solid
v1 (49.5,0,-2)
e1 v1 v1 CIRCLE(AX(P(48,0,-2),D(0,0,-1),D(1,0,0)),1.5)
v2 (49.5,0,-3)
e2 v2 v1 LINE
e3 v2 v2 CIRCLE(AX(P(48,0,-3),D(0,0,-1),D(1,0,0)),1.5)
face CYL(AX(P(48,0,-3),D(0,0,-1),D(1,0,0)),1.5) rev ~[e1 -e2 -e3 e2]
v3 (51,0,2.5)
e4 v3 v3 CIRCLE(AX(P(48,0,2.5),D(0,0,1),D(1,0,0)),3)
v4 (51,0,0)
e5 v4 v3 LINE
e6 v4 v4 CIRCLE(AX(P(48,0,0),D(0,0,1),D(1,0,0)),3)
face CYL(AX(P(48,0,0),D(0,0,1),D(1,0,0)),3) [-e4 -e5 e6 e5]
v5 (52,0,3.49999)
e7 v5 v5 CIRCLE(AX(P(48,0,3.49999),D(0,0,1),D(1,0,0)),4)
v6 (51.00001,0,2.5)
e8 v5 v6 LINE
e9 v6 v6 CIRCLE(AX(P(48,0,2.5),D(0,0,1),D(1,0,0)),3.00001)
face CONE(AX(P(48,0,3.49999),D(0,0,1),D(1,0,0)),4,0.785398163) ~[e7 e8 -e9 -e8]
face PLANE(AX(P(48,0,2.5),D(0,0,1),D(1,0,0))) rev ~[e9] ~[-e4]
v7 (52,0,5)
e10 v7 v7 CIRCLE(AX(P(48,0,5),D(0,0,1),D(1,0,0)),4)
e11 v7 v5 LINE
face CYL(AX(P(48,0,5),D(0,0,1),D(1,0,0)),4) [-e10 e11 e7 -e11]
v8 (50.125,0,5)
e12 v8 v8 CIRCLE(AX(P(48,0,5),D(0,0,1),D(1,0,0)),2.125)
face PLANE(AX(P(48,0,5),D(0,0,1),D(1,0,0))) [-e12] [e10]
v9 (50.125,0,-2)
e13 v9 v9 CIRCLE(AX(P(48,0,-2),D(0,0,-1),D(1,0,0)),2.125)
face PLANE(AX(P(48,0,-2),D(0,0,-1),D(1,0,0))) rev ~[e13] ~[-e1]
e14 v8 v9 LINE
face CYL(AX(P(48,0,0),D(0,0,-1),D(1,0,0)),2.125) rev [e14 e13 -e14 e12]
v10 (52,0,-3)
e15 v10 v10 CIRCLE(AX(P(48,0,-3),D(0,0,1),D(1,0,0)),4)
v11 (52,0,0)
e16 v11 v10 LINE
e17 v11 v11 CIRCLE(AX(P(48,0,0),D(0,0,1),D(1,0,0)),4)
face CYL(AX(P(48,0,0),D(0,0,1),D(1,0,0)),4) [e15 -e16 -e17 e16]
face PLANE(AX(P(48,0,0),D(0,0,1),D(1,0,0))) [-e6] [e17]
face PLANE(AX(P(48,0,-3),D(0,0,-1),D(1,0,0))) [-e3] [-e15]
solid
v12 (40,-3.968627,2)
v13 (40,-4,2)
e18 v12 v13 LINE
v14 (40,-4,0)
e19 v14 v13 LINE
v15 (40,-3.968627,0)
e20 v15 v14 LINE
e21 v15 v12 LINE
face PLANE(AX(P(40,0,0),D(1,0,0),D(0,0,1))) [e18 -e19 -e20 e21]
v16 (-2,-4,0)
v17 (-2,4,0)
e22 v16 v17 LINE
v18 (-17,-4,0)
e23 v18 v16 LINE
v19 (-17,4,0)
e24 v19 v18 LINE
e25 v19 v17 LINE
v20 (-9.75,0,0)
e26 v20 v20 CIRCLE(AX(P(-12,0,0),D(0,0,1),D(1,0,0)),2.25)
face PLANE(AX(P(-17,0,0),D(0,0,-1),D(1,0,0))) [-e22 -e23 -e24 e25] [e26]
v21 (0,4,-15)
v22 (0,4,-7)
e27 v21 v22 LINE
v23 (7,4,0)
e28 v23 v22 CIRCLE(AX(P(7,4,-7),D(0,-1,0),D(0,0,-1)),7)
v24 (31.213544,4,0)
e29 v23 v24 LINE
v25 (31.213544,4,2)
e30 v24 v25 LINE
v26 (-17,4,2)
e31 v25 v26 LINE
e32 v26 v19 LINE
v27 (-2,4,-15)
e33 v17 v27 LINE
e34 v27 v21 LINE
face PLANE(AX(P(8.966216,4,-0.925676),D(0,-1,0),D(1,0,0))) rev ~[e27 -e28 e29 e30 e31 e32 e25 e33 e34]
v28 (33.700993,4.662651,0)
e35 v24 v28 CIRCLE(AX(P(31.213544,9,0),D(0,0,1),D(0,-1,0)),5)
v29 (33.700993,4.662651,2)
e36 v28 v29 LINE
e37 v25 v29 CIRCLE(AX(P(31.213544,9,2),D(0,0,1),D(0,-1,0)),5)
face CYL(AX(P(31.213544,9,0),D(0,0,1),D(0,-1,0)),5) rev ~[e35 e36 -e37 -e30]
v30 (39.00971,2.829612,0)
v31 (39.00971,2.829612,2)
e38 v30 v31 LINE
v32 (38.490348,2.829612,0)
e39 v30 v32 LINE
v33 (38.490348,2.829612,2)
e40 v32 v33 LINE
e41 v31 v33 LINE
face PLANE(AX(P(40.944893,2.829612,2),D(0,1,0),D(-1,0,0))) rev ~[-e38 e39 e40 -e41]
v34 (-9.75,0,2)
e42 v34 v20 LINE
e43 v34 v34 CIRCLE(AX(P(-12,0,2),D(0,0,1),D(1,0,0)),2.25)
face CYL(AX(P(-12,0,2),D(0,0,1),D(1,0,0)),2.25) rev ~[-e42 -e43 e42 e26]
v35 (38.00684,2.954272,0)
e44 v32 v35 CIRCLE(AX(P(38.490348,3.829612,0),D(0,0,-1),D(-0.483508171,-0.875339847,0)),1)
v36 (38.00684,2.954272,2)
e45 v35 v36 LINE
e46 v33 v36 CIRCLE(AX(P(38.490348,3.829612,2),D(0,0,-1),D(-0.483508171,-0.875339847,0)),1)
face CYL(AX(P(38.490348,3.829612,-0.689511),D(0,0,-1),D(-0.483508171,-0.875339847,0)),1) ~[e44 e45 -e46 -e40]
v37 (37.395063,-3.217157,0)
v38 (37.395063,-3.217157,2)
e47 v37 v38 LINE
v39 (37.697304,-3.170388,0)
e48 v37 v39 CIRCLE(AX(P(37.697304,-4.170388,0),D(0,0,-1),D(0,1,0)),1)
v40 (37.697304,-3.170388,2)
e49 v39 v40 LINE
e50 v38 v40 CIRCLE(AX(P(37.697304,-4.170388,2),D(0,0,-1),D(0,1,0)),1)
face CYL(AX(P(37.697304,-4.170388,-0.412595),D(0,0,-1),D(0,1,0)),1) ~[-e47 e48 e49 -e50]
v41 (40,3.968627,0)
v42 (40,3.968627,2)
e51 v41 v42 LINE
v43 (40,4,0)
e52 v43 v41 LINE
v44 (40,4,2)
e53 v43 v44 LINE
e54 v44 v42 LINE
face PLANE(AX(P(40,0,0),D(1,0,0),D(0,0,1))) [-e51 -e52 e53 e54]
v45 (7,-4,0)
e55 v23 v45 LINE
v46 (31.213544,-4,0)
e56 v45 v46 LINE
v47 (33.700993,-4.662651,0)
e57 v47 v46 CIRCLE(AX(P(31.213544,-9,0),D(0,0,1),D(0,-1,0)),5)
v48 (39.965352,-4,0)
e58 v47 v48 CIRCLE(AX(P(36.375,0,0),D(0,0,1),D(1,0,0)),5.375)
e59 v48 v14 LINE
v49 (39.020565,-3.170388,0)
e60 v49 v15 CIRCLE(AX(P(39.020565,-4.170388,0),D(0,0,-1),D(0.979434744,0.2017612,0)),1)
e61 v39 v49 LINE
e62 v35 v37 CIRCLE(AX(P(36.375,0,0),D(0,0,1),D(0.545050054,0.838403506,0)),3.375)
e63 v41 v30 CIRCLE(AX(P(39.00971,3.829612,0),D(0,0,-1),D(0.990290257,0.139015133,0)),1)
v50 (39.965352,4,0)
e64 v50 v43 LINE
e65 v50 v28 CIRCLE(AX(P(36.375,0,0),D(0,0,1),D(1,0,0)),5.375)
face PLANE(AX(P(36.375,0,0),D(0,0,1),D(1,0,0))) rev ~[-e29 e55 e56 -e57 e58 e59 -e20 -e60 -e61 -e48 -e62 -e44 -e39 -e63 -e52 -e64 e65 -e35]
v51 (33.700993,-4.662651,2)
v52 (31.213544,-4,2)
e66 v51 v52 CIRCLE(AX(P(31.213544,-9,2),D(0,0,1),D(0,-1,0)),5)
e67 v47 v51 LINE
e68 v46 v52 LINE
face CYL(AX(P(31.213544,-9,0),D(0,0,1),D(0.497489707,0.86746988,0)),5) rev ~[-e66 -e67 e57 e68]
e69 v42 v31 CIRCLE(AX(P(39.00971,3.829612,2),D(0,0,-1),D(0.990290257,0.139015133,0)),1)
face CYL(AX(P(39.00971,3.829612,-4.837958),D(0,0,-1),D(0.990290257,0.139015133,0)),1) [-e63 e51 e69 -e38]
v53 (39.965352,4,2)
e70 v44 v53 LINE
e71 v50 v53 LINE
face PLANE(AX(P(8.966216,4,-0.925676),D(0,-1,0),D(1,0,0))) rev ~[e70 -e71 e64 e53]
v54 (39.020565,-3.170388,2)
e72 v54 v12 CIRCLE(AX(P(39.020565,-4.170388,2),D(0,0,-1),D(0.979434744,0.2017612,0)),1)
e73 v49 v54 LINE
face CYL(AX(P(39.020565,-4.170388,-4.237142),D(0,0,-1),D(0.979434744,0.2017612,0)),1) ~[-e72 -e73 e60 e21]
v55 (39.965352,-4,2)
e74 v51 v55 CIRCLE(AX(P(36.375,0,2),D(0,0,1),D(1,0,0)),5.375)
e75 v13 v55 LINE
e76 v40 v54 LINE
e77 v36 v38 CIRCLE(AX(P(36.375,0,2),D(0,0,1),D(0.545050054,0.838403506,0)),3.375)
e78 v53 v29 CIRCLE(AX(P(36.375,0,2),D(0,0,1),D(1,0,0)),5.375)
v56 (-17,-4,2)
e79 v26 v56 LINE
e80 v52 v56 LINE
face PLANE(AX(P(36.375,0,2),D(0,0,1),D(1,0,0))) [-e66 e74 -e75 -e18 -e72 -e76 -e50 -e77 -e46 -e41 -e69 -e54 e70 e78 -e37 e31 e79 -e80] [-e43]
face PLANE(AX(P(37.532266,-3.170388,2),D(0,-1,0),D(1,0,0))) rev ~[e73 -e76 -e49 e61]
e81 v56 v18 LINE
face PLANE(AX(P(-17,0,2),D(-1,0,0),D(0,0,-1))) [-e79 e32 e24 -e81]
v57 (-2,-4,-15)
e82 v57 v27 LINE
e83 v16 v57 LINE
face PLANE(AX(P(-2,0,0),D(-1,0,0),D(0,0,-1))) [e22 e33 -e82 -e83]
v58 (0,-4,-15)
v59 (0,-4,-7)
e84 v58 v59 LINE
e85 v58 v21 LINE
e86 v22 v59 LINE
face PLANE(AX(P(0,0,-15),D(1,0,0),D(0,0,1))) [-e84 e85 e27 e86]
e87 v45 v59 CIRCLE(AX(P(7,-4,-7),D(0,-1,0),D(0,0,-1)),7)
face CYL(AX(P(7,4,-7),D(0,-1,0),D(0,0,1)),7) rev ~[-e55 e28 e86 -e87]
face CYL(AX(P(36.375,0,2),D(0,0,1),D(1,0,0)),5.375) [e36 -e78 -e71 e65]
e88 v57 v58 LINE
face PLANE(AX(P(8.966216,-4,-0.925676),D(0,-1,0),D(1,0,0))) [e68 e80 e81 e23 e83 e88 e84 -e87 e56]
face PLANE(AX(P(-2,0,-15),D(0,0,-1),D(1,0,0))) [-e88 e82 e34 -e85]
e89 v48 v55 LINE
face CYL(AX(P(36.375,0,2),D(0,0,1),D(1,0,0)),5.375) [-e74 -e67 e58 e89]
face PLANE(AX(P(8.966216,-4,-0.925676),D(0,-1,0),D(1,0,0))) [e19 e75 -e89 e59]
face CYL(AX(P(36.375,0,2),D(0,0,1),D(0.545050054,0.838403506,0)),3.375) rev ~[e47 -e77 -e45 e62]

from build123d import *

# Parameters (mm, degrees)
F1_DEPTH       = 4
F2_R           = 5.375
F3_DEPTH       = 2
F5_DEPTH       = 17.001
F6_R           = 7
F7_T1_DEPTH    = 3.3790215822
F7_T3_DEPTH    = 2.8251909372
F7_T5_DEPTH    = 10.474284143
F7_T7_DEPTH    = 11.6759161977
F8_R           = 2.25
F9_DEPTH       = 17.001
F10_R          = 3
F10_R_2        = 2.125
F11_DEPTH      = 5
F11_DEPTH_BACK = 3
F10_R_3        = 4
F12_DEPTH      = 3
F13_R          = 4
F13_R_2        = 3
F14_DEPTH      = 2.5
F15_R          = 2.125
F15_R_2        = 1.5
F16_DEPTH      = 1
F17_SIZE       = 0.99999
F18_R          = 5


# Not quite as in the source:
# - a fillet or chamfer that OpenCascade refuses, or shapes differently, is made with other operations: its cross-section is extruded or revolved along the edge and cut away or added
# - a fillet or chamfer is up to 0.001 mm smaller than in the source, because OpenCascade refuses the exact size


with BuildPart() as f1:
    # F0 (on Front) → F1 (new body, symmetric)
    with BuildSketch(Plane.XZ):
        Polygon((0, -15), (0, 0), (40, 0), (40, 2), (0, 2), (-17, 2), (-17, 0), (-2, 0), (-2, -15), align=None)
    extrude(amount=F1_DEPTH, both=True)

    # F2 (on face) → F3 (join, through all)
    with BuildSketch(Plane.XY.offset(2)):
        with Locations((36.375, 0)):
            Circle(F2_R)
    extrude(amount=-F3_DEPTH)

    # F4 (on face) → F5 (cut, through all)
    with BuildSketch(Plane.XY.offset(2)):
        with BuildLine():
            Line((40.9448929828, 2.8296118331), (38.214543931, 2.8296118331))
            ThreePointArc((38.214543931, 2.8296118331), (33.0216111212, 0.3813240457), (37.5322656873, -3.1703881669))
            Line((37.5322656873, -3.1703881669), (40.7154220844, -3.1703881669))
            ThreePointArc((40.7154220844, -3.1703881669), (41.7460733238, -0.2054175034), (40.9448929828, 2.8296118331))
        make_face()
    extrude(amount=-F5_DEPTH, mode=Mode.SUBTRACT)

    # F6
    f6_edges = [f1.edges().sort_by_distance(p)[0] for p in [
        (0, 0, 0),
    ]]
    fillet(f6_edges, radius=F6_R)

    # F7: fillet of radius 1 on 4 edges, made by hand

    # F7_s2 → F7_t1 (cut)
    with BuildSketch(Plane.XY.offset(-0.6895107911)):
        with BuildLine():
            ThreePointArc((38.0068400766, 2.9542719855), (38.2406883263, 2.8612782522), (38.4903482474, 2.8296118331))
            Line((38.4903482474, 2.8296118331), (38.214543931, 2.8296118331))
            ThreePointArc((38.214543931, 2.8296118331), (38.1118108044, 2.8938060111), (38.0068400766, 2.9542719855))
        make_face()
    extrude(amount=F7_T1_DEPTH, mode=Mode.SUBTRACT)

    # F7_s4 → F7_t3 (cut)
    with BuildSketch(Plane.XY.offset(-0.4125954686)):
        with BuildLine():
            ThreePointArc((37.6973038748, -3.1703881669), (37.544384911, -3.1821494354), (37.3950629891, -3.2171565859))
            ThreePointArc((37.3950629891, -3.2171565859), (37.4639154525, -3.1945090605), (37.5322656873, -3.1703881669))
            Line((37.5322656873, -3.1703881669), (37.6973038748, -3.1703881669))
        make_face()
    extrude(amount=F7_T3_DEPTH, mode=Mode.SUBTRACT)

    # F7_s6 → F7_t5 (cut)
    with BuildSketch(Plane.XY.offset(-4.2371420715)):
        with BuildLine():
            ThreePointArc((40, -3.9686269666), (39.6523242288, -3.3952232811), (39.0205652559, -3.1703881669))
            Line((39.0205652559, -3.1703881669), (40.7154220844, -3.1703881669))
            ThreePointArc((40.7154220844, -3.1703881669), (40.3776595585, -3.5873864385), (40, -3.9686269666))
        make_face()
    extrude(amount=F7_T5_DEPTH, mode=Mode.SUBTRACT)

    # F7_s8 → F7_t7 (cut)
    with BuildSketch(Plane.XY.offset(-4.8379580989)):
        with BuildLine():
            ThreePointArc((40, 3.9686269666), (39.7643669944, 3.1734926113), (39.0097097432, 2.8296118331))
            Line((39.0097097432, 2.8296118331), (40.9448929828, 2.8296118331))
            ThreePointArc((40.9448929828, 2.8296118331), (40.5118353386, 3.4317952127), (40, 3.9686269666))
        make_face()
    extrude(amount=F7_T7_DEPTH, mode=Mode.SUBTRACT)

    # F8 (on face) → F9 (cut, through all)
    with BuildSketch(Plane.XY.offset(2)):
        with Locations((-12, 0)):
            Circle(F8_R)
    extrude(amount=-F9_DEPTH, mode=Mode.SUBTRACT)

    # F18
    f18_edges = [f1.edges().sort_by_distance(p)[0] for p in [
        (32.784648, 4, 1),
        (32.784648, -4, 1),
    ]]
    fillet(f18_edges, radius=F18_R)


with BuildPart() as f11:
    # F10 (on Top) → F11 (new body, two sides)
    with BuildSketch(Plane.XY) as f11_sk:
        with Locations((48, 0)):
            Circle(F10_R)
        with Locations((48, 0)):
            Circle(F10_R_2, mode=Mode.SUBTRACT)
    extrude(amount=F11_DEPTH)
    extrude(f11_sk.sketch, amount=-F11_DEPTH_BACK)

    # F10 (on Top) → F12 (join, through all)
    with BuildSketch(Plane.XY):
        with Locations((48, 0)):
            Circle(F10_R_3)
        with Locations((48, 0)):
            Circle(F10_R, mode=Mode.SUBTRACT)
    extrude(amount=-F12_DEPTH)

    # F13 (on face) → F14 (join)
    with BuildSketch(Plane.XY.offset(5)):
        with Locations((48, 0)):
            Circle(F13_R)
        with Locations((48, 0)):
            Circle(F13_R_2, mode=Mode.SUBTRACT)
    extrude(amount=-F14_DEPTH)

    # F15 (on face) → F16 (join)
    with BuildSketch(Plane(origin=(0, 0, -3), x_dir=(1, 0, 0), z_dir=(0, 0, -1))):
        with Locations((48, 0)):
            Circle(F15_R)
        with Locations((48, 0)):
            Circle(F15_R_2, mode=Mode.SUBTRACT)
    extrude(amount=-F16_DEPTH)

    # F17 (size 1 in the source; OpenCascade refuses exactly that, so slightly less here)
    f17_edges = [f11.edges().sort_by_distance(p)[0] for p in [
        (44, 0, 2.5),
    ]]
    chamfer(f17_edges, length=F17_SIZE)


solid = Compound([f1.part, f11.part])
